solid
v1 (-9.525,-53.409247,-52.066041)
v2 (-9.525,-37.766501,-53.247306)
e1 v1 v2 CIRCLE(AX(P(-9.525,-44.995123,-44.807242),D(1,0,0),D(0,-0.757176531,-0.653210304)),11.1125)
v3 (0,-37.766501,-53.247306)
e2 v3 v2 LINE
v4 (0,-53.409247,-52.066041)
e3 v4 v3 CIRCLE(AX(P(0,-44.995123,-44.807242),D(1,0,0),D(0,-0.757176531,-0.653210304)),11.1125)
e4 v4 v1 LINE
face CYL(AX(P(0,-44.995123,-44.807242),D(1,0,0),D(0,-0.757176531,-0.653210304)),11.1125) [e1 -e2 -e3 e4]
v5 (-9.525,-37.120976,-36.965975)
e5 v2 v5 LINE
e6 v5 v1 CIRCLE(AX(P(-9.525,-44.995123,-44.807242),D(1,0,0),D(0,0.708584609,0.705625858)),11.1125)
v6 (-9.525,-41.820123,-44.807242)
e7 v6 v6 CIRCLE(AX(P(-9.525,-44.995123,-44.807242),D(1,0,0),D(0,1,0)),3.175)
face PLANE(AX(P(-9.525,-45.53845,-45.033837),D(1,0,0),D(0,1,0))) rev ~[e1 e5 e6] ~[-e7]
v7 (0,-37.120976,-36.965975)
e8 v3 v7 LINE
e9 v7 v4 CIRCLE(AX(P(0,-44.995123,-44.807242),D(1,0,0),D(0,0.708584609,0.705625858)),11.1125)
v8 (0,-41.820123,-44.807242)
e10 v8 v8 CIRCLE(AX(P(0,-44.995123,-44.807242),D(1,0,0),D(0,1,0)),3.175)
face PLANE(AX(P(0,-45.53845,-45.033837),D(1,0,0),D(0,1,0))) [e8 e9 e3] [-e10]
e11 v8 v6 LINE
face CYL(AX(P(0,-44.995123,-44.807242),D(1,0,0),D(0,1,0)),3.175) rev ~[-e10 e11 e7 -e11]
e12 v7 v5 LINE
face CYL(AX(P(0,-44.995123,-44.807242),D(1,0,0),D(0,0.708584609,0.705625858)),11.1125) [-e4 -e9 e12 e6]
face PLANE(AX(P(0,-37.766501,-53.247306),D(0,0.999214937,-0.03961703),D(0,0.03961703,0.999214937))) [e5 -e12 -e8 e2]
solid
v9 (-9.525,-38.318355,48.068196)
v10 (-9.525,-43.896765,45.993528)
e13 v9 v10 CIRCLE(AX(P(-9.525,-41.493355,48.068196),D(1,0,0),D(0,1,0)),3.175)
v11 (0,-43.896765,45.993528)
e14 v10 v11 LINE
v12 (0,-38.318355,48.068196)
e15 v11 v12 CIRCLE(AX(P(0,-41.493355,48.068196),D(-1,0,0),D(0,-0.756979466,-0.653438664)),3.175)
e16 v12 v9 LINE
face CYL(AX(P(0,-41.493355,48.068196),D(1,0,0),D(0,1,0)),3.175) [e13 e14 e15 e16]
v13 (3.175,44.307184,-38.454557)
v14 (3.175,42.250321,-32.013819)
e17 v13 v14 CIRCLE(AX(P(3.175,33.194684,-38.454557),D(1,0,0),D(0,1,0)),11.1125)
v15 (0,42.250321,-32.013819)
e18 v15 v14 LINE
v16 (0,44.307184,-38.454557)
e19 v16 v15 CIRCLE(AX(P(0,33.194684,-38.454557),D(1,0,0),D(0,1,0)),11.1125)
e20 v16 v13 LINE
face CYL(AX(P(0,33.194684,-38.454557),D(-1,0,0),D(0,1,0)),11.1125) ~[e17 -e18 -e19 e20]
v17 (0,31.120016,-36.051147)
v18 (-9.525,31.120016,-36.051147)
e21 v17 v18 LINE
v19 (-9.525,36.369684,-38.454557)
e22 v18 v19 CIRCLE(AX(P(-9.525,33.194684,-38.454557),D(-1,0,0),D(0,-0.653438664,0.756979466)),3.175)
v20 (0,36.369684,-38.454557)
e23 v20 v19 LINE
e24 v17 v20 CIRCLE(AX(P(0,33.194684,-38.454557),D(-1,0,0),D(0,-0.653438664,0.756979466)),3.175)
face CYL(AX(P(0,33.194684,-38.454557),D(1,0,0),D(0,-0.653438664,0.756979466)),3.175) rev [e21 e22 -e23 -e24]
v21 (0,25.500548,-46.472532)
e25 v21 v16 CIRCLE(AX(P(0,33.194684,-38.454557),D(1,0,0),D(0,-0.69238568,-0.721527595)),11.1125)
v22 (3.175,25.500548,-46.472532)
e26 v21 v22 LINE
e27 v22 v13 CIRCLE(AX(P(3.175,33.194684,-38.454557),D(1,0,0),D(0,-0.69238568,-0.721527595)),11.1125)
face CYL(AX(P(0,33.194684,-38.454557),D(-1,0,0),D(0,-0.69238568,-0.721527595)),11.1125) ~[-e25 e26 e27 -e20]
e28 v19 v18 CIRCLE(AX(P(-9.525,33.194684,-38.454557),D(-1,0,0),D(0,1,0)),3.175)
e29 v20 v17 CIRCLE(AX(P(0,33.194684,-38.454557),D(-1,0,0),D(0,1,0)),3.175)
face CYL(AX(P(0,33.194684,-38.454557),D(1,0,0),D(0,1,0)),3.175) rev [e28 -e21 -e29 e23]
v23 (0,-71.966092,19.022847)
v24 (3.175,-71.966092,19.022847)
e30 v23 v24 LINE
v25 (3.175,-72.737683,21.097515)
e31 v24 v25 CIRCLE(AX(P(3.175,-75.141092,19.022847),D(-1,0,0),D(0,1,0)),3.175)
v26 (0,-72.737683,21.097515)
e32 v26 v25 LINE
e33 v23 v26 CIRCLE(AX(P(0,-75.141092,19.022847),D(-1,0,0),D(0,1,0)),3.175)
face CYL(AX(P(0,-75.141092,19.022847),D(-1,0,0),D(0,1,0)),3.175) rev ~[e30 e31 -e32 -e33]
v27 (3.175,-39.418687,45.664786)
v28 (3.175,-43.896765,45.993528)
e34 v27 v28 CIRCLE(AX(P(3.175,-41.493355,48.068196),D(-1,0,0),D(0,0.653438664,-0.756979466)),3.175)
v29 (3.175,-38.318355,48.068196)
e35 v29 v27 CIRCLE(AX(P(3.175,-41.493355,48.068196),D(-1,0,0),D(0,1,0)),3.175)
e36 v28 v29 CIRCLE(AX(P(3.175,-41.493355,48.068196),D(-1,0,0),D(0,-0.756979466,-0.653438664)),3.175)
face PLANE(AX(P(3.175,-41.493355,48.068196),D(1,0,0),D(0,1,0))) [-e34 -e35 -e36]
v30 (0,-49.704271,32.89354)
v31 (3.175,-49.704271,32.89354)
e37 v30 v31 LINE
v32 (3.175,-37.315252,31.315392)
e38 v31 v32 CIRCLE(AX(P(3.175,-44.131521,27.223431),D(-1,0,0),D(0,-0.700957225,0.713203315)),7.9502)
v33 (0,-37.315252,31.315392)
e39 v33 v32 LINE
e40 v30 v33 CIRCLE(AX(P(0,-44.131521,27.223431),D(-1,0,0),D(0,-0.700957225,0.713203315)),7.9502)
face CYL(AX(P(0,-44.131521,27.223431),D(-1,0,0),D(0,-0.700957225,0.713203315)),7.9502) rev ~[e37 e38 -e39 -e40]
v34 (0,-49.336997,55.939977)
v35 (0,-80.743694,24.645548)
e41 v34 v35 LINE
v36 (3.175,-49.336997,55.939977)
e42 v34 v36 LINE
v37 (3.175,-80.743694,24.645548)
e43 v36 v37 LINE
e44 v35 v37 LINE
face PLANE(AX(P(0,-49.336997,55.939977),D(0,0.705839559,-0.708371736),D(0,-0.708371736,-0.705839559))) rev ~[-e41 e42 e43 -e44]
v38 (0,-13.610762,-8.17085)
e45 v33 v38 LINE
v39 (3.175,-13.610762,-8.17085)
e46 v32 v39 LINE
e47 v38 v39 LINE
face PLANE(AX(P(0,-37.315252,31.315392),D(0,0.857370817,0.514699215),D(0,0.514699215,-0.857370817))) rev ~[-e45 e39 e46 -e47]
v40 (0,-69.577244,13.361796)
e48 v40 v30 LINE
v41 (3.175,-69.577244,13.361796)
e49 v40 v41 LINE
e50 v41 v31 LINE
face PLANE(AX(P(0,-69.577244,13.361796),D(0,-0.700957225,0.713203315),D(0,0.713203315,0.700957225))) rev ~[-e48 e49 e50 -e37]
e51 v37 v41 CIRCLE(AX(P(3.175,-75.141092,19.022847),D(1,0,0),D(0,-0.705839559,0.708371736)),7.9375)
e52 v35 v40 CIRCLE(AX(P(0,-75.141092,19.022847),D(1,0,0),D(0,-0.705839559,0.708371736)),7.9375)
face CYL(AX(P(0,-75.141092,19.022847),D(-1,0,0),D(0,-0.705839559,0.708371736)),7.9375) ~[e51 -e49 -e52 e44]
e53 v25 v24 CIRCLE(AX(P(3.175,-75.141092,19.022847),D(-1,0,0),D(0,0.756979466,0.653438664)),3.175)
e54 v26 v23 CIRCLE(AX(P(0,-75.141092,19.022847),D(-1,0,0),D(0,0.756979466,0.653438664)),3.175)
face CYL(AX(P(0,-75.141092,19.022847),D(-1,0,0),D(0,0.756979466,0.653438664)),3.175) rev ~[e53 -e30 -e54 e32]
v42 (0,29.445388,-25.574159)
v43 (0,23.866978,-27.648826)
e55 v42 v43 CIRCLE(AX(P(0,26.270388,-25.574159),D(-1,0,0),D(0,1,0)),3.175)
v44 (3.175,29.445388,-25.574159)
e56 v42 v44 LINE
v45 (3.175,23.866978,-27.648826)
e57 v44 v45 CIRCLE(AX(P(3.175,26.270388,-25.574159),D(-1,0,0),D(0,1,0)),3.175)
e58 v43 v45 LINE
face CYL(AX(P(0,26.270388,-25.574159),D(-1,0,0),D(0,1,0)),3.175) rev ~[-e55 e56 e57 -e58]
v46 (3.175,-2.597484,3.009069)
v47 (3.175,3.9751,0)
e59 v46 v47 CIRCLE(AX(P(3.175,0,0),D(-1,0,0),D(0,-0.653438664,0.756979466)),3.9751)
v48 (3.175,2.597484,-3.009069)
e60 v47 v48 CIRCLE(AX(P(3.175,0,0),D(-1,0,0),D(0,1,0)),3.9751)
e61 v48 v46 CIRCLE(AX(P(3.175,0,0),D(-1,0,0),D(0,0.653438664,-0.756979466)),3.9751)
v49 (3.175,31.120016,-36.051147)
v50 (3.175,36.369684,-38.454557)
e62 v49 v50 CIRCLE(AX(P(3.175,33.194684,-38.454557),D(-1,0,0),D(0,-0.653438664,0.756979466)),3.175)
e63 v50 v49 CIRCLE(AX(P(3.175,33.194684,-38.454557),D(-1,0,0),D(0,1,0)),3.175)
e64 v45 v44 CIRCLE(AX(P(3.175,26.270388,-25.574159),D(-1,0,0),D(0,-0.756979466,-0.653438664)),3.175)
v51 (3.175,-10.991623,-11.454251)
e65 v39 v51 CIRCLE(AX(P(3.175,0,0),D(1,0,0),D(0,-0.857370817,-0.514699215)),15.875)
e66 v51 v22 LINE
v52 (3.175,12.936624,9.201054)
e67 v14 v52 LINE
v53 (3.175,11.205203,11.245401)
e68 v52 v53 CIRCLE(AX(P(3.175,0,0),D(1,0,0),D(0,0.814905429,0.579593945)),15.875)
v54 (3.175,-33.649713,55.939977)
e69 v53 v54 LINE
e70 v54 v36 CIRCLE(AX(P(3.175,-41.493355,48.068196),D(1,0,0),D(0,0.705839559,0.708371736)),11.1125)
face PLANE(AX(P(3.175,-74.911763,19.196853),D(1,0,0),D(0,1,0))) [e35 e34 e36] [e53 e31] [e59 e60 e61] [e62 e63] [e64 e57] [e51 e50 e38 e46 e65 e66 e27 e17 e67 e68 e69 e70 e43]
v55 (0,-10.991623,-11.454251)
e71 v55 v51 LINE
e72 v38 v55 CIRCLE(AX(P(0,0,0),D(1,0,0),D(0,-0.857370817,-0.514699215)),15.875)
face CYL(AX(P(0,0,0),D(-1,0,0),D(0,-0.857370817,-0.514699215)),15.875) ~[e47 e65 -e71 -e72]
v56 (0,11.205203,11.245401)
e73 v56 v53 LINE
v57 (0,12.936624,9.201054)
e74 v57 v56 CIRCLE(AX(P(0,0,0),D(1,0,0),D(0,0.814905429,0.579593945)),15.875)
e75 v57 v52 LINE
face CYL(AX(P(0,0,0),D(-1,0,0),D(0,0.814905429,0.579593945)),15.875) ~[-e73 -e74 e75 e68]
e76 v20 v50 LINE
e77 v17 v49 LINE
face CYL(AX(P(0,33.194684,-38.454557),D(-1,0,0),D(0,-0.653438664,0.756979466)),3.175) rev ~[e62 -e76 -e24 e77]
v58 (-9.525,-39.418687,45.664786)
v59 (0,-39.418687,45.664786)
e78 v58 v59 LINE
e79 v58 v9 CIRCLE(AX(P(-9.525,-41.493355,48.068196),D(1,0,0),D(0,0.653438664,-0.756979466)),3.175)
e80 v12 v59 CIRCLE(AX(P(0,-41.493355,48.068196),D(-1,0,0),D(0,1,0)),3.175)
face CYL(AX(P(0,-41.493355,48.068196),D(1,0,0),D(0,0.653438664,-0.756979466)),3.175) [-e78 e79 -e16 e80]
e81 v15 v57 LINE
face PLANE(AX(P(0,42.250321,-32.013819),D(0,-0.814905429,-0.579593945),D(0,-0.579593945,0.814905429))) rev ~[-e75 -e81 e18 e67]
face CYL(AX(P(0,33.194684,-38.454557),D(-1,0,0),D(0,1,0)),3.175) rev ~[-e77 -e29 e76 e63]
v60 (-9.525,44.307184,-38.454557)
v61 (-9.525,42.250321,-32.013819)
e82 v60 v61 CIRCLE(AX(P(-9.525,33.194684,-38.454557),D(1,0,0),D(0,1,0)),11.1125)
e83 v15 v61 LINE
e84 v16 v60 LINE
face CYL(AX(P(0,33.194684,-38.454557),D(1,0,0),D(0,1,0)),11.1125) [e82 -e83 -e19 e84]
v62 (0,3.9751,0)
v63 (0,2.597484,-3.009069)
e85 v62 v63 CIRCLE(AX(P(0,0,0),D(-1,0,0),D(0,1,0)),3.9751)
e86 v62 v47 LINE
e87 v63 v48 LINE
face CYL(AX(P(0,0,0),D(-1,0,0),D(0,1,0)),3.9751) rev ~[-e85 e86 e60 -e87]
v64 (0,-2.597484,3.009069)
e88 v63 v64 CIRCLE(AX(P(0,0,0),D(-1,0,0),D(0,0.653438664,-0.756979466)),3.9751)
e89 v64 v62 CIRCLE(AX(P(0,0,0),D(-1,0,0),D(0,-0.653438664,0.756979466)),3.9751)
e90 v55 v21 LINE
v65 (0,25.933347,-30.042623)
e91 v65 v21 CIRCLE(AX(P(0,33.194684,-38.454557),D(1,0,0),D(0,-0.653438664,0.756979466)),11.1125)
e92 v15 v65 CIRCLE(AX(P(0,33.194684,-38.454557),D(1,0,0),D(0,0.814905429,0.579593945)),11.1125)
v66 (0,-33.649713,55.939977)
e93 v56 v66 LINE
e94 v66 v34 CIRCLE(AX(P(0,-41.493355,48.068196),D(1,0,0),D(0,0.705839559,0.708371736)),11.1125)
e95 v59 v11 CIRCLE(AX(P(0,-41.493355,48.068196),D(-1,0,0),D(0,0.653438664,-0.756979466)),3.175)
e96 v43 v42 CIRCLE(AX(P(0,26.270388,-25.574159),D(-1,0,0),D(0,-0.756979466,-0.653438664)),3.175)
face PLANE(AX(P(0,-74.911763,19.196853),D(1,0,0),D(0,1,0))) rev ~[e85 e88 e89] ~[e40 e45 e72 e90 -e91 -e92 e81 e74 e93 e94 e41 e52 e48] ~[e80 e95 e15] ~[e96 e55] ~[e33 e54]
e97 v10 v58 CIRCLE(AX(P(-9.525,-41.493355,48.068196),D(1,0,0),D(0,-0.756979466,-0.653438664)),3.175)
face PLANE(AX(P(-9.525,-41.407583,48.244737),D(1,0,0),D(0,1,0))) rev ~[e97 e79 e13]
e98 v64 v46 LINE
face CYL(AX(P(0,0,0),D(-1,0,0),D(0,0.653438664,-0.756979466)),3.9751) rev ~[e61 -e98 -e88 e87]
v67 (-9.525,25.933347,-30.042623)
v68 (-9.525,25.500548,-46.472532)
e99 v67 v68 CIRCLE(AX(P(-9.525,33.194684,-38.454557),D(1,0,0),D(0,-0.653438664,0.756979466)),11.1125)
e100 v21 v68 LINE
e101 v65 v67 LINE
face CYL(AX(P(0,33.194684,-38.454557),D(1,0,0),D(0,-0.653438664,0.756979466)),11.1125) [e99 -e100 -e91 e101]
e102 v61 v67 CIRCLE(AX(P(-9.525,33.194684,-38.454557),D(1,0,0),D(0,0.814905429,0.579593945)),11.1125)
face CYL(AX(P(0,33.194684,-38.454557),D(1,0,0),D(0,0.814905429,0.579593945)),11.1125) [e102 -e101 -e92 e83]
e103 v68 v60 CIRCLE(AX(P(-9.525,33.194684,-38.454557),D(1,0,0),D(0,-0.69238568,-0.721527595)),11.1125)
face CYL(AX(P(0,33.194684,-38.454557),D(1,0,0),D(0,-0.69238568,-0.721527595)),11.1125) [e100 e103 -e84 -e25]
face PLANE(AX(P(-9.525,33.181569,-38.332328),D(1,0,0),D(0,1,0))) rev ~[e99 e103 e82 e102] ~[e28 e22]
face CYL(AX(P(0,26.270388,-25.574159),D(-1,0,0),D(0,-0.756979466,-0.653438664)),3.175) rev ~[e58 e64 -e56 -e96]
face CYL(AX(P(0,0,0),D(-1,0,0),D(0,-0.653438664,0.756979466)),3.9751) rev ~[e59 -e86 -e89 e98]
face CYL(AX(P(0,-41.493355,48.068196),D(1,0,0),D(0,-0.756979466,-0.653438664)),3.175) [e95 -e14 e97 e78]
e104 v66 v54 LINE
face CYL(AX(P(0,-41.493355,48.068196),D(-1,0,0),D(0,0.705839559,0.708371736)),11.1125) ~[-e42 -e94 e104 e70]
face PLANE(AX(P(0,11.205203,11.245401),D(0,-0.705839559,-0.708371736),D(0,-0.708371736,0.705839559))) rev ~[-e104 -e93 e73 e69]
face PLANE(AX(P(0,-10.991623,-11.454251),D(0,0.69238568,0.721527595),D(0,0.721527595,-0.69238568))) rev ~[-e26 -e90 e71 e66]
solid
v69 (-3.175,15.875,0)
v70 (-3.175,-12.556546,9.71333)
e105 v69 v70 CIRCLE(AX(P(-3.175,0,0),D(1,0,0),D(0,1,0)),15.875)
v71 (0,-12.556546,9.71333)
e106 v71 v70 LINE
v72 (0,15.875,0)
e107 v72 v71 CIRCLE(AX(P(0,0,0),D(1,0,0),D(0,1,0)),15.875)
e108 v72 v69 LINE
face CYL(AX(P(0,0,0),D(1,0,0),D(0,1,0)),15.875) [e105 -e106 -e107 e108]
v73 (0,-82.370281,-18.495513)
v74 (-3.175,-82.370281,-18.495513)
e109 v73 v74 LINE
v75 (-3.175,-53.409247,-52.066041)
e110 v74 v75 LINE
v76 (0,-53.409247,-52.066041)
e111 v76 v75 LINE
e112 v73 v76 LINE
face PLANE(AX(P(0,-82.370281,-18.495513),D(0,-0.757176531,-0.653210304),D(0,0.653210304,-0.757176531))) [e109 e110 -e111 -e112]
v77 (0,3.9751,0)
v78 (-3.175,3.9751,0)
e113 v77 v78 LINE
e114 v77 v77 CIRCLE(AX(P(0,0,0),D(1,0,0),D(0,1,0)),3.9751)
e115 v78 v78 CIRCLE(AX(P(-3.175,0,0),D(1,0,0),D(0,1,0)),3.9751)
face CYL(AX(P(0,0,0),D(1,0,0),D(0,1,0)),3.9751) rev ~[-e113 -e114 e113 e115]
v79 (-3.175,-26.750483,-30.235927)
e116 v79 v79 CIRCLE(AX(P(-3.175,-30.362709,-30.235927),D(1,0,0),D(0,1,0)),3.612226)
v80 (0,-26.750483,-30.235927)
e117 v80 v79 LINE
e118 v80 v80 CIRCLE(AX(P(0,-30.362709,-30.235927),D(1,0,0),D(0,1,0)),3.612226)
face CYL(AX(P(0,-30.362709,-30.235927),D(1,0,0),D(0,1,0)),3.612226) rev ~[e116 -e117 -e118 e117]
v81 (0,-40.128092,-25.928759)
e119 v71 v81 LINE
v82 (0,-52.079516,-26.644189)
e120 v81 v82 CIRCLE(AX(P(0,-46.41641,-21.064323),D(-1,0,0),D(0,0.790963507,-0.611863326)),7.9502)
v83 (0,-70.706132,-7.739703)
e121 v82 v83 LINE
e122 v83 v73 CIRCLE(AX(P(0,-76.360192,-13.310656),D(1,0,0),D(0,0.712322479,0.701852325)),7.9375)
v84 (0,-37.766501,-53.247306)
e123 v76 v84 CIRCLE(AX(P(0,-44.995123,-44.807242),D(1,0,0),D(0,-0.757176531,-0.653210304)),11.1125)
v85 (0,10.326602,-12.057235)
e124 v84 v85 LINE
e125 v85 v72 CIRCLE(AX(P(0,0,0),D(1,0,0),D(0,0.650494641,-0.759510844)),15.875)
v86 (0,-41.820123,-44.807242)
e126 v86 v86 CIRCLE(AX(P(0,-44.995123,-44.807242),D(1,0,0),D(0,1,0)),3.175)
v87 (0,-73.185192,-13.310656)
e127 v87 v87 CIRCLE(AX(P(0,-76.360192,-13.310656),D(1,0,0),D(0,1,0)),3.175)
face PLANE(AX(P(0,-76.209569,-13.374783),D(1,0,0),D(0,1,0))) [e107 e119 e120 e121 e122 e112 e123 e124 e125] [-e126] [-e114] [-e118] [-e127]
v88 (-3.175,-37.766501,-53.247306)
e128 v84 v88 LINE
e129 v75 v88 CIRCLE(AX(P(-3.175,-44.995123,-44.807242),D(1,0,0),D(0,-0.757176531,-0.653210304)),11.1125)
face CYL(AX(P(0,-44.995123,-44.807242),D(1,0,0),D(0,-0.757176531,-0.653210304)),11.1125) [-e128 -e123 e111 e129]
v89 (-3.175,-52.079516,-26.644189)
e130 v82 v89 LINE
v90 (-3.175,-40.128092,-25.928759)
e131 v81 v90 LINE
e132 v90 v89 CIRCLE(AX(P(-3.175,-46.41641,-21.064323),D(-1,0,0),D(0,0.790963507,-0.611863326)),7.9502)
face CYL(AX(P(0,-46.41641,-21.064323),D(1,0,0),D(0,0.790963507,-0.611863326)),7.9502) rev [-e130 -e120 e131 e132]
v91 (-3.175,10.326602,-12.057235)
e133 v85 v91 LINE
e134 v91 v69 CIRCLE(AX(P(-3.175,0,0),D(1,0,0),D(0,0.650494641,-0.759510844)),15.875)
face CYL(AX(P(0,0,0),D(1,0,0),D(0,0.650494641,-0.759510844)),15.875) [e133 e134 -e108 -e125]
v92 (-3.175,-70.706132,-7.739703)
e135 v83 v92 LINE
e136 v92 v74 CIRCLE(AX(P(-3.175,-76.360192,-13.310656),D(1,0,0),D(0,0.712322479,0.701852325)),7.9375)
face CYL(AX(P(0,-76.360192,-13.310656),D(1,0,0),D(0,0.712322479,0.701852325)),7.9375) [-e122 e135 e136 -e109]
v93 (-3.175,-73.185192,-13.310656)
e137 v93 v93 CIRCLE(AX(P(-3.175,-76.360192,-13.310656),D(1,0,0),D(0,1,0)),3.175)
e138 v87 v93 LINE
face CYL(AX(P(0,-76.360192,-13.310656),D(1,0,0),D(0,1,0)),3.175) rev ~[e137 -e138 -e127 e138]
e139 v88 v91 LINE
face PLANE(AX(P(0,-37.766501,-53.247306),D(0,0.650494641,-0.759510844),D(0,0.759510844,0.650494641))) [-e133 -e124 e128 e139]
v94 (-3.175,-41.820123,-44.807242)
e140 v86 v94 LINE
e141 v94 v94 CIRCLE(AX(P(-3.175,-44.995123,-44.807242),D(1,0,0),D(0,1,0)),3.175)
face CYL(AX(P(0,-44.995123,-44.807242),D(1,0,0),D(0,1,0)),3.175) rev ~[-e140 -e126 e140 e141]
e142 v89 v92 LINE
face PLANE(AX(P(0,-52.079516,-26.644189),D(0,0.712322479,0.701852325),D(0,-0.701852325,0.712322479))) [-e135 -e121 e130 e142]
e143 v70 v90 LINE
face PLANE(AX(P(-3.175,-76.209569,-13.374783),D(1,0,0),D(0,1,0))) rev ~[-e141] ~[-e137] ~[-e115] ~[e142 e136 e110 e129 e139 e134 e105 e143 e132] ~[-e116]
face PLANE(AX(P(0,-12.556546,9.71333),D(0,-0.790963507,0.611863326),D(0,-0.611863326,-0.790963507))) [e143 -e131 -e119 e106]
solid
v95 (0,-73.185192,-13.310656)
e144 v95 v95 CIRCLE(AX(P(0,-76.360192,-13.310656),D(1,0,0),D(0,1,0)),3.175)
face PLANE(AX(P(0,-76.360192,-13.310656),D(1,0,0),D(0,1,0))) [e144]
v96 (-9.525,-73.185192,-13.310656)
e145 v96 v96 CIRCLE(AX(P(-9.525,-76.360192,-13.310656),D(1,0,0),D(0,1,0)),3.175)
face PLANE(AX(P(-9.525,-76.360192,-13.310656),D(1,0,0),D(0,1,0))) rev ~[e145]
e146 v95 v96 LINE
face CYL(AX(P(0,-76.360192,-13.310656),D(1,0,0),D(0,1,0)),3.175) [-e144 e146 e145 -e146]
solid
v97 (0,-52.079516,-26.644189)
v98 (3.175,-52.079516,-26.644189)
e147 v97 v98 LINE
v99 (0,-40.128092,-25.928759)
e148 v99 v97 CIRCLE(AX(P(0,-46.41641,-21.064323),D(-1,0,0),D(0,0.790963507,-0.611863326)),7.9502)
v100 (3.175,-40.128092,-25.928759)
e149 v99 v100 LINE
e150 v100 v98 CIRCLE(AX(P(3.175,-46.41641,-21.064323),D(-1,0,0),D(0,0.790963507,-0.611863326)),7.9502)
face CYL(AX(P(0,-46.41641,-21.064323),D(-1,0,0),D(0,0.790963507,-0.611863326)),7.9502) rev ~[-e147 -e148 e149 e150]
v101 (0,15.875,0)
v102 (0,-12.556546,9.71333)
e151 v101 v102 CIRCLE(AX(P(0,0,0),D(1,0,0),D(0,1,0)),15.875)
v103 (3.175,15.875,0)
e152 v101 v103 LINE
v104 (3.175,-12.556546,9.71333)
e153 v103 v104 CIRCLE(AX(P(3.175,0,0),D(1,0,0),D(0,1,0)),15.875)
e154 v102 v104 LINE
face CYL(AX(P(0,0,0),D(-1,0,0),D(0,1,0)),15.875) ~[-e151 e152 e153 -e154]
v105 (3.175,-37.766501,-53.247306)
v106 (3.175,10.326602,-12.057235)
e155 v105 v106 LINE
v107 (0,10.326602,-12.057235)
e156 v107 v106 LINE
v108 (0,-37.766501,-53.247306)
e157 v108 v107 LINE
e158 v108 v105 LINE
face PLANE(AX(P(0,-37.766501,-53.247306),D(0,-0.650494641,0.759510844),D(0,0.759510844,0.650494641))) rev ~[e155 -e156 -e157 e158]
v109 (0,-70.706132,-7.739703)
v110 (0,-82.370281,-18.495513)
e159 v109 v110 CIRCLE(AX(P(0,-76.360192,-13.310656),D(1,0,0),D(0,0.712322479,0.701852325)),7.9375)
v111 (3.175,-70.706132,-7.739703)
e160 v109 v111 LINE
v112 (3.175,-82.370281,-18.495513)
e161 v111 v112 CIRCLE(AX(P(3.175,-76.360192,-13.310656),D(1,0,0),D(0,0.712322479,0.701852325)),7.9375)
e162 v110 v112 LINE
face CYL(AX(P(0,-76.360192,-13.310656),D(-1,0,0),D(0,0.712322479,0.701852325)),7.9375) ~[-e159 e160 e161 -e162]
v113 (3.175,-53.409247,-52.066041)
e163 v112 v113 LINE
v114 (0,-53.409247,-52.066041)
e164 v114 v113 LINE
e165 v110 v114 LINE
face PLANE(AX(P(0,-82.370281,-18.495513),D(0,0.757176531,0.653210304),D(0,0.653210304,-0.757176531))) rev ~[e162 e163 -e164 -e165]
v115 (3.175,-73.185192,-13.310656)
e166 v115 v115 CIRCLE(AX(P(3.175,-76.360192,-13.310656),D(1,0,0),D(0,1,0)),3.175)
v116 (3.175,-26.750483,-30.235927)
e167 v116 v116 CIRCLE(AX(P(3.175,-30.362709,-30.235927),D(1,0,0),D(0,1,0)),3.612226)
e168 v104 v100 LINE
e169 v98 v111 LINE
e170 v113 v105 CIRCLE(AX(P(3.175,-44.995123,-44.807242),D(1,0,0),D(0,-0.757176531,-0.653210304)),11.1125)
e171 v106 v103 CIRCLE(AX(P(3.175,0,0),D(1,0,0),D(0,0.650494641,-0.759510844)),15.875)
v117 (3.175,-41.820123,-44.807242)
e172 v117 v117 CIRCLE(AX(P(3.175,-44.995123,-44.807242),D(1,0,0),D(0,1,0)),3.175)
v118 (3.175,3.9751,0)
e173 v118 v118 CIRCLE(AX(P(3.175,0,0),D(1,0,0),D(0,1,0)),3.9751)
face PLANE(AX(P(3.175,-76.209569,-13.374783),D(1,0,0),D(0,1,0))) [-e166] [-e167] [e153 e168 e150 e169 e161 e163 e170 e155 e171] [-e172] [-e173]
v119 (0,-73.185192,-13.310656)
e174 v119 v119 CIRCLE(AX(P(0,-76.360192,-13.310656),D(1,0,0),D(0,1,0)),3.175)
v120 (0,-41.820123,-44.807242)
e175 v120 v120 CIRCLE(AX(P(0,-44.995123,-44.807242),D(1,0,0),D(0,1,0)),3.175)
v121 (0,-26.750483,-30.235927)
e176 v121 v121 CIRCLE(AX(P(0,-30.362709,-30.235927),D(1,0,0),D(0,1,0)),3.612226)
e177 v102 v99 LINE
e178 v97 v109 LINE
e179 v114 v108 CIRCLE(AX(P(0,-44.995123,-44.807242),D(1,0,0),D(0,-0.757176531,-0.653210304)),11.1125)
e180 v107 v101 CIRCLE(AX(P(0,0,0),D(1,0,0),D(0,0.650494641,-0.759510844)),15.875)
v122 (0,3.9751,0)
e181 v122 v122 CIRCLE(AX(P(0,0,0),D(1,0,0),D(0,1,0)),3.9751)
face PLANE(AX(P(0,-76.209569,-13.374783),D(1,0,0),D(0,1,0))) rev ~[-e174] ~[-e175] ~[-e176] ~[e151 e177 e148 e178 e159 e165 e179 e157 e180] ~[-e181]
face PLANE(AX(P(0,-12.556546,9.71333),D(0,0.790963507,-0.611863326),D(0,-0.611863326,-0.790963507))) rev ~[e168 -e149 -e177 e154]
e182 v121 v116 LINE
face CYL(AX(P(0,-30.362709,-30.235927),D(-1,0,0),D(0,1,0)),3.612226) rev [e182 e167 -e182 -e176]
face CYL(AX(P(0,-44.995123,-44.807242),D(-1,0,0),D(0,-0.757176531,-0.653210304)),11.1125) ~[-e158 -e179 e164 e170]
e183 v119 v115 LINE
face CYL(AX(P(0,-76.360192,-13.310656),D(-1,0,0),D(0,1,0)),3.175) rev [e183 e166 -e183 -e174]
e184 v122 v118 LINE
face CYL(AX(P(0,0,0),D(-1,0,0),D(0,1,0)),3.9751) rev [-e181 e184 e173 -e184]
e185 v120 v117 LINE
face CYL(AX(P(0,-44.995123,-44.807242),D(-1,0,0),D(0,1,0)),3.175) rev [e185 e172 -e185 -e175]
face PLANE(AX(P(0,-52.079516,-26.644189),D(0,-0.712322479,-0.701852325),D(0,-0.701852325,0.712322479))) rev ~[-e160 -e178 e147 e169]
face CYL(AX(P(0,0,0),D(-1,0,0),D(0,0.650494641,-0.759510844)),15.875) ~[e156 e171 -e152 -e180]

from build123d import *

# Parameters (mm, degrees)
F2_DEPTH = 3.175
F1_R     = 3.175
F1_R_2   = 3.6122259131
F1_R_3   = 3.9751
F3_DEPTH = 3.175
F4_R     = 3.175
F6_DEPTH = 9.525
F7_DEPTH = 9.525


with BuildPart() as f2:
    # F0 (on Right) → F2 (new body)
    with BuildSketch(Plane.YZ):
        with BuildLine():
            ThreePointArc((-69.1325679357, 24.2095168657), (-74.8432263912, 26.9547565738), (-80.7436939481, 24.6455481248))
            ThreePointArc((-80.7436939481, 24.6455481248), (-80.7830017069, 13.4395898025), (-69.5772444737, 13.3617961545))
            ThreePointArc((-69.5772444737, 13.3617961545), (-67.8210190346, 15.9535753265), (-67.2035924475, 19.022847468))
            ThreePointArc((-67.2035924475, 19.022847468), (-67.7014496617, 21.7897268417), (-69.1325679357, 24.2095168657))
        make_face()
        with BuildLine():
            ThreePointArc((-71.9660924475, 19.022847468), (-78.1169495619, 17.9160957186), (-72.7376826428, 21.0975152271))
            ThreePointArc((-72.7376826428, 21.0975152271), (-72.1652353332, 20.1295992175), (-71.9660924475, 19.022847468))
        make_face(mode=Mode.SUBTRACT)
        with BuildLine():
            Line((-49.336997282, 55.9399770143), (-80.7436939481, 24.6455481248))
            ThreePointArc((-80.7436939481, 24.6455481248), (-74.8432263912, 26.9547565738), (-69.1325679357, 24.2095168657))
            Line((-69.1325679357, 24.2095168657), (-49.9052894977, 40.8068589381))
            ThreePointArc((-49.9052894977, 40.8068589381), (-52.5980279292, 48.4852085737), (-49.336997282, 55.9399770143))
        make_face()
        with BuildLine():
            ThreePointArc((-67.2035924475, 19.022847468), (-67.8210190346, 15.9535753265), (-69.5772444737, 13.3617961545))
            Line((-69.5772444737, 13.3617961545), (-49.7042712662, 32.8935395696))
            ThreePointArc((-49.7042712662, 32.8935395696), (-43.1269205627, 35.1099036595), (-37.3152516644, 31.3153922718))
            Line((-37.3152516644, 31.3153922718), (-13.6107617236, -8.1708500356))
            ThreePointArc((-13.6107617236, -8.1708500356), (-15.6747276382, 2.5136703181), (-10.3733387953, 12.0170490237))
            Line((-10.3733387953, 12.0170490237), (-34.2320180244, 39.6562617782))
            ThreePointArc((-34.2320180244, 39.6562617782), (-42.3069502353, 36.9855195527), (-49.9052894977, 40.8068589381))
            Line((-49.9052894977, 40.8068589381), (-69.1325679357, 24.2095168657))
            ThreePointArc((-69.1325679357, 24.2095168657), (-67.7014496617, 21.7897268417), (-67.2035924475, 19.022847468))
        make_face()
        with BuildLine():
            ThreePointArc((-33.6497130803, 55.9399770143), (-41.4933551811, 59.1806960948), (-49.336997282, 55.9399770143))
            ThreePointArc((-49.336997282, 55.9399770143), (-52.5980279292, 48.4852085737), (-49.9052894977, 40.8068589381))
            Line((-49.9052894977, 40.8068589381), (-43.8967649859, 45.9935283358))
            ThreePointArc((-43.8967649859, 45.9935283358), (-42.6001069306, 51.0440532092), (-38.3183551811, 48.0681960948))
            ThreePointArc((-38.3183551811, 48.0681960948), (-38.6065147686, 46.7465390166), (-39.4186874221, 45.6647862901))
            Line((-39.4186874221, 45.6647862901), (-34.2320180244, 39.6562617782))
            ThreePointArc((-34.2320180244, 39.6562617782), (-31.3894137372, 43.442396321), (-30.3808551811, 48.0681960948))
            ThreePointArc((-30.3808551811, 48.0681960948), (-31.2305551467, 52.3299553211), (-33.6497130803, 55.9399770143))
        make_face()
        with BuildLine():
            Line((11.2052030012, 11.2454013135), (-33.6497130803, 55.9399770143))
            ThreePointArc((-33.6497130803, 55.9399770143), (-31.2305551467, 52.3299553211), (-30.3808551811, 48.0681960948))
            ThreePointArc((-30.3808551811, 48.0681960948), (-31.3894137372, 43.442396321), (-34.2320180244, 39.6562617782))
            Line((-34.2320180244, 39.6562617782), (-10.3733387953, 12.0170490237))
            ThreePointArc((-10.3733387953, 12.0170490237), (0.5673266796, 15.8648594522), (11.2052030012, 11.2454013135))
        make_face()
        with BuildLine():
            ThreePointArc((12.9366236895, 9.2010538807), (12.114115242, 10.2598166116), (11.2052030012, 11.2454013135))
            ThreePointArc((11.2052030012, 11.2454013135), (0.5673266796, 15.8648594522), (-10.3733387953, 12.0170490237))
            Line((-10.3733387953, 12.0170490237), (-2.5974840343, 3.0090690755))
            ThreePointArc((-2.5974840343, 3.0090690755), (1.654714662, 3.6143241965), (3.9751, 0))
            ThreePointArc((3.9751, 0), (3.6143241965, -1.654714662), (2.5974840343, -3.0090690755))
            Line((2.5974840343, -3.0090690755), (10.3733387953, -12.0170490237))
            ThreePointArc((10.3733387953, -12.0170490237), (14.4342020627, -6.6082853913), (15.875, 0))
            ThreePointArc((15.875, 0), (15.1225746166, 4.8294266704), (12.9366236895, 9.2010538807))
        make_face()
        with BuildLine():
            ThreePointArc((-10.3733387953, 12.0170490237), (-15.6747276382, 2.5136703181), (-13.6107617236, -8.1708500356))
            ThreePointArc((-13.6107617236, -8.1708500356), (-12.4102582236, -9.899551294), (-10.9916226654, -11.4542505727))
            ThreePointArc((-10.9916226654, -11.4542505727), (-0.4180361948, -15.8694949743), (10.3733387953, -12.0170490237))
            Line((10.3733387953, -12.0170490237), (2.5974840343, -3.0090690755))
            ThreePointArc((2.5974840343, -3.0090690755), (-3.0090690755, -2.5974840343), (-2.5974840343, 3.0090690755))
            Line((-2.5974840343, 3.0090690755), (-10.3733387953, 12.0170490237))
        make_face()
        with BuildLine():
            Line((42.2503207276, -32.0138191594), (12.9366236895, 9.2010538807))
            ThreePointArc((12.9366236895, 9.2010538807), (15.1225746166, 4.8294266704), (15.875, 0))
            ThreePointArc((15.875, 0), (14.4342020627, -6.6082853913), (10.3733387953, -12.0170490237))
            Line((10.3733387953, -12.0170490237), (23.8669779002, -27.6488263938))
            Line((23.8669779002, -27.6488263938), (25.9333469882, -30.0426225593))
            ThreePointArc((25.9333469882, -30.0426225593), (34.5274562997, -27.4222690518), (42.2503207276, -32.0138191594))
        make_face()
        with BuildLine():
            ThreePointArc((29.4453877049, -25.5741586347), (27.3771394544, -28.550015749), (23.8669779002, -27.6488263938))
            ThreePointArc((23.8669779002, -27.6488263938), (25.1636359555, -22.5983015203), (29.4453877049, -25.5741586347))
        make_face(mode=Mode.SUBTRACT)
        with BuildLine():
            ThreePointArc((10.3733387953, -12.0170490237), (-0.4180361948, -15.8694949743), (-10.9916226654, -11.4542505727))
            Line((-10.9916226654, -11.4542505727), (25.5005482791, -46.4725322767))
            ThreePointArc((25.5005482791, -46.4725322767), (22.0860376629, -38.1619315395), (25.9333469882, -30.0426225593))
            Line((25.9333469882, -30.0426225593), (23.8669779002, -27.6488263938))
            Line((23.8669779002, -27.6488263938), (10.3733387953, -12.0170490237))
        make_face()
        with BuildLine():
            ThreePointArc((44.3071841449, -38.4545568759), (43.7804863765, -35.0739582066), (42.2503207276, -32.0138191594))
            ThreePointArc((42.2503207276, -32.0138191594), (34.5274562997, -27.4222690518), (25.9333469882, -30.0426225593))
            ThreePointArc((25.9333469882, -30.0426225593), (22.0860376629, -38.1619315395), (25.5005482791, -46.4725322767))
            ThreePointArc((25.5005482791, -46.4725322767), (37.5528128398, -48.6768056759), (44.3071841449, -38.4545568759))
        make_face()
        with BuildLine():
            ThreePointArc((36.3696841449, -38.4545568759), (31.8730270667, -41.3413972884), (31.1200163859, -36.0511470711))
            ThreePointArc((31.1200163859, -36.0511470711), (34.5163412232, -35.5677164633), (36.3696841449, -38.4545568759))
        make_face(mode=Mode.SUBTRACT)
        with BuildLine():
            Line((-43.8967649859, 45.9935283358), (-49.9052894977, 40.8068589381))
            ThreePointArc((-49.9052894977, 40.8068589381), (-42.3069502353, 36.9855195527), (-34.2320180244, 39.6562617782))
            Line((-34.2320180244, 39.6562617782), (-39.4186874221, 45.6647862901))
            ThreePointArc((-39.4186874221, 45.6647862901), (-41.7258109109, 44.9017170828), (-43.8967649859, 45.9935283358))
        make_face()
    extrude(amount=F2_DEPTH)

    # F0 (on Right) + F4 (on face) → F6 (join, through all)
    with BuildSketch(Plane.YZ):
        with BuildLine():
            ThreePointArc((-38.3183551811, 48.0681960948), (-42.6001069306, 51.0440532092), (-43.8967649859, 45.9935283358))
            Line((-43.8967649859, 45.9935283358), (-41.4933551811, 48.0681960948))
            Line((-41.4933551811, 48.0681960948), (-39.4186874221, 45.6647862901))
            ThreePointArc((-39.4186874221, 45.6647862901), (-38.6065147686, 46.7465390166), (-38.3183551811, 48.0681960948))
        make_face()
        with BuildLine():
            Line((-41.4933551811, 48.0681960948), (-43.8967649859, 45.9935283358))
            ThreePointArc((-43.8967649859, 45.9935283358), (-41.7258109109, 44.9017170828), (-39.4186874221, 45.6647862901))
            Line((-39.4186874221, 45.6647862901), (-41.4933551811, 48.0681960948))
        make_face()
        with BuildLine():
            ThreePointArc((44.3071841449, -38.4545568759), (43.7804863765, -35.0739582066), (42.2503207276, -32.0138191594))
            ThreePointArc((42.2503207276, -32.0138191594), (34.5274562997, -27.4222690518), (25.9333469882, -30.0426225593))
            ThreePointArc((25.9333469882, -30.0426225593), (22.0860376629, -38.1619315395), (25.5005482791, -46.4725322767))
            ThreePointArc((25.5005482791, -46.4725322767), (37.5528128398, -48.6768056759), (44.3071841449, -38.4545568759))
        make_face()
        with BuildLine():
            ThreePointArc((36.3696841449, -38.4545568759), (31.8730270667, -41.3413972884), (31.1200163859, -36.0511470711))
            ThreePointArc((31.1200163859, -36.0511470711), (34.5163412232, -35.5677164633), (36.3696841449, -38.4545568759))
        make_face(mode=Mode.SUBTRACT)
    with BuildSketch(Plane.YZ.offset(3.175)):
        with Locations((-41.4933551811, 48.0681960948)):
            Circle(F4_R)
    extrude(amount=-F6_DEPTH)


with BuildPart() as f2b:
    # F1 (on Right) → F2, piece 2 (new body)
    with BuildSketch(Plane.YZ):
        with BuildLine():
            ThreePointArc((-82.370280796, -18.4955128706), (-73.5944347637, -20.7507160795), (-68.4226920805, -13.3106560855))
            ThreePointArc((-68.4226920805, -13.3106560855), (-69.0157041836, -10.3002734217), (-70.7061324036, -7.7397032567))
            ThreePointArc((-70.7061324036, -7.7397032567), (-81.7410423183, -7.4753877139), (-82.370280796, -18.4955128706))
        make_face()
        with Locations((-76.3601920805, -13.3106560855)):
            Circle(F1_R, mode=Mode.SUBTRACT)
        with BuildLine():
            ThreePointArc((-70.7061324036, -7.7397032567), (-69.0157041836, -10.3002734217), (-68.4226920805, -13.3106560855))
            ThreePointArc((-68.4226920805, -13.3106560855), (-73.5944347637, -20.7507160795), (-82.370280796, -18.4955128706))
            Line((-82.370280796, -18.4955128706), (-53.4092469001, -52.0660414735))
            ThreePointArc((-53.4092469001, -52.0660414735), (-52.5499819735, -36.6579010449), (-37.1209762262, -36.9659746289))
            ThreePointArc((-37.1209762262, -36.9659746289), (-34.7240684945, -40.5654143272), (-33.8826226985, -44.8072419744))
            ThreePointArc((-33.8826226985, -44.8072419744), (-34.9001805283, -49.4526481816), (-37.7665010031, -53.2473062298))
            Line((-37.7665010031, -53.2473062298), (10.3266024219, -12.0572346506))
            ThreePointArc((10.3266024219, -12.0572346506), (-10.9422363509, -11.5014385466), (-12.5565456786, 9.7133303054))
            Line((-12.5565456786, 9.7133303054), (-40.1280920851, -25.9287585557))
            ThreePointArc((-40.1280920851, -25.9287585557), (-45.9413494341, -29.0003165232), (-52.0795163333, -26.644189092))
            Line((-52.0795163333, -26.644189092), (-70.7061324036, -7.7397032567))
        make_face()
        with Locations((-30.3627087969, -30.2359268843)):
            Circle(F1_R_2, mode=Mode.SUBTRACT)
        with BuildLine():
            ThreePointArc((-37.1209762262, -36.9659746289), (-52.5499819735, -36.6579010449), (-53.4092469001, -52.0660414735))
            ThreePointArc((-53.4092469001, -52.0660414735), (-45.8319026302, -55.8881920959), (-37.7665010031, -53.2473062298))
            Line((-37.7665010031, -53.2473062298), (-37.1209762262, -36.9659746289))
        make_face()
        with Locations((-44.9951226985, -44.8072419744)):
            Circle(F1_R, mode=Mode.SUBTRACT)
        with BuildLine():
            ThreePointArc((-33.8826226985, -44.8072419744), (-34.7240684945, -40.5654143272), (-37.1209762262, -36.9659746289))
            Line((-37.1209762262, -36.9659746289), (-37.7665010031, -53.2473062298))
            ThreePointArc((-37.7665010031, -53.2473062298), (-34.9001805283, -49.4526481816), (-33.8826226985, -44.8072419744))
        make_face()
        with BuildLine():
            ThreePointArc((15.875, 0), (5.13227349, 15.0224962581), (-12.5565456786, 9.7133303054))
            ThreePointArc((-12.5565456786, 9.7133303054), (-10.9422363509, -11.5014385466), (10.3266024219, -12.0572346506))
            ThreePointArc((10.3266024219, -12.0572346506), (14.4213459574, -6.6362945818), (15.875, 0))
        make_face()
        Circle(F1_R_3, mode=Mode.SUBTRACT)
    extrude(amount=F2_DEPTH)


with BuildPart() as f3:
    # F1 (on Right) → F3 (new body)
    with BuildSketch(Plane.YZ):
        with BuildLine():
            ThreePointArc((-82.370280796, -18.4955128706), (-73.5944347637, -20.7507160795), (-68.4226920805, -13.3106560855))
            ThreePointArc((-68.4226920805, -13.3106560855), (-69.0157041836, -10.3002734217), (-70.7061324036, -7.7397032567))
            ThreePointArc((-70.7061324036, -7.7397032567), (-81.7410423183, -7.4753877139), (-82.370280796, -18.4955128706))
        make_face()
        with Locations((-76.3601920805, -13.3106560855)):
            Circle(F1_R, mode=Mode.SUBTRACT)
        with BuildLine():
            ThreePointArc((-70.7061324036, -7.7397032567), (-69.0157041836, -10.3002734217), (-68.4226920805, -13.3106560855))
            ThreePointArc((-68.4226920805, -13.3106560855), (-73.5944347637, -20.7507160795), (-82.370280796, -18.4955128706))
            Line((-82.370280796, -18.4955128706), (-53.4092469001, -52.0660414735))
            ThreePointArc((-53.4092469001, -52.0660414735), (-52.5499819735, -36.6579010449), (-37.1209762262, -36.9659746289))
            ThreePointArc((-37.1209762262, -36.9659746289), (-34.7240684945, -40.5654143272), (-33.8826226985, -44.8072419744))
            ThreePointArc((-33.8826226985, -44.8072419744), (-34.9001805283, -49.4526481816), (-37.7665010031, -53.2473062298))
            Line((-37.7665010031, -53.2473062298), (10.3266024219, -12.0572346506))
            ThreePointArc((10.3266024219, -12.0572346506), (-10.9422363509, -11.5014385466), (-12.5565456786, 9.7133303054))
            Line((-12.5565456786, 9.7133303054), (-40.1280920851, -25.9287585557))
            ThreePointArc((-40.1280920851, -25.9287585557), (-45.9413494341, -29.0003165232), (-52.0795163333, -26.644189092))
            Line((-52.0795163333, -26.644189092), (-70.7061324036, -7.7397032567))
        make_face()
        with Locations((-30.3627087969, -30.2359268843)):
            Circle(F1_R_2, mode=Mode.SUBTRACT)
        with BuildLine():
            ThreePointArc((-37.1209762262, -36.9659746289), (-52.5499819735, -36.6579010449), (-53.4092469001, -52.0660414735))
            ThreePointArc((-53.4092469001, -52.0660414735), (-45.8319026302, -55.8881920959), (-37.7665010031, -53.2473062298))
            Line((-37.7665010031, -53.2473062298), (-37.1209762262, -36.9659746289))
        make_face()
        with Locations((-44.9951226985, -44.8072419744)):
            Circle(F1_R, mode=Mode.SUBTRACT)
        with BuildLine():
            ThreePointArc((-33.8826226985, -44.8072419744), (-34.7240684945, -40.5654143272), (-37.1209762262, -36.9659746289))
            Line((-37.1209762262, -36.9659746289), (-37.7665010031, -53.2473062298))
            ThreePointArc((-37.7665010031, -53.2473062298), (-34.9001805283, -49.4526481816), (-33.8826226985, -44.8072419744))
        make_face()
        with BuildLine():
            ThreePointArc((15.875, 0), (5.13227349, 15.0224962581), (-12.5565456786, 9.7133303054))
            ThreePointArc((-12.5565456786, 9.7133303054), (-10.9422363509, -11.5014385466), (10.3266024219, -12.0572346506))
            ThreePointArc((10.3266024219, -12.0572346506), (14.4213459574, -6.6362945818), (15.875, 0))
        make_face()
        Circle(F1_R_3, mode=Mode.SUBTRACT)
    extrude(amount=-F3_DEPTH)


with BuildPart() as f6:
    # F1 (on Right) → F6, piece 2 (new body, through all)
    with BuildSketch(Plane.YZ):
        with Locations((-76.3601920805, -13.3106560855)):
            Circle(F1_R)
    extrude(amount=-F6_DEPTH)


with BuildPart() as f7:
    # F1 (on Right) → F7 (new body, through all)
    with BuildSketch(Plane.YZ):
        with BuildLine():
            ThreePointArc((-37.1209762262, -36.9659746289), (-52.5499819735, -36.6579010449), (-53.4092469001, -52.0660414735))
            ThreePointArc((-53.4092469001, -52.0660414735), (-45.8319026302, -55.8881920959), (-37.7665010031, -53.2473062298))
            Line((-37.7665010031, -53.2473062298), (-37.1209762262, -36.9659746289))
        make_face()
        with Locations((-44.9951226985, -44.8072419744)):
            Circle(F1_R, mode=Mode.SUBTRACT)
    extrude(amount=-F7_DEPTH)


solid = Compound([f2.part, f2b.part, f3.part, f6.part, f7.part])
